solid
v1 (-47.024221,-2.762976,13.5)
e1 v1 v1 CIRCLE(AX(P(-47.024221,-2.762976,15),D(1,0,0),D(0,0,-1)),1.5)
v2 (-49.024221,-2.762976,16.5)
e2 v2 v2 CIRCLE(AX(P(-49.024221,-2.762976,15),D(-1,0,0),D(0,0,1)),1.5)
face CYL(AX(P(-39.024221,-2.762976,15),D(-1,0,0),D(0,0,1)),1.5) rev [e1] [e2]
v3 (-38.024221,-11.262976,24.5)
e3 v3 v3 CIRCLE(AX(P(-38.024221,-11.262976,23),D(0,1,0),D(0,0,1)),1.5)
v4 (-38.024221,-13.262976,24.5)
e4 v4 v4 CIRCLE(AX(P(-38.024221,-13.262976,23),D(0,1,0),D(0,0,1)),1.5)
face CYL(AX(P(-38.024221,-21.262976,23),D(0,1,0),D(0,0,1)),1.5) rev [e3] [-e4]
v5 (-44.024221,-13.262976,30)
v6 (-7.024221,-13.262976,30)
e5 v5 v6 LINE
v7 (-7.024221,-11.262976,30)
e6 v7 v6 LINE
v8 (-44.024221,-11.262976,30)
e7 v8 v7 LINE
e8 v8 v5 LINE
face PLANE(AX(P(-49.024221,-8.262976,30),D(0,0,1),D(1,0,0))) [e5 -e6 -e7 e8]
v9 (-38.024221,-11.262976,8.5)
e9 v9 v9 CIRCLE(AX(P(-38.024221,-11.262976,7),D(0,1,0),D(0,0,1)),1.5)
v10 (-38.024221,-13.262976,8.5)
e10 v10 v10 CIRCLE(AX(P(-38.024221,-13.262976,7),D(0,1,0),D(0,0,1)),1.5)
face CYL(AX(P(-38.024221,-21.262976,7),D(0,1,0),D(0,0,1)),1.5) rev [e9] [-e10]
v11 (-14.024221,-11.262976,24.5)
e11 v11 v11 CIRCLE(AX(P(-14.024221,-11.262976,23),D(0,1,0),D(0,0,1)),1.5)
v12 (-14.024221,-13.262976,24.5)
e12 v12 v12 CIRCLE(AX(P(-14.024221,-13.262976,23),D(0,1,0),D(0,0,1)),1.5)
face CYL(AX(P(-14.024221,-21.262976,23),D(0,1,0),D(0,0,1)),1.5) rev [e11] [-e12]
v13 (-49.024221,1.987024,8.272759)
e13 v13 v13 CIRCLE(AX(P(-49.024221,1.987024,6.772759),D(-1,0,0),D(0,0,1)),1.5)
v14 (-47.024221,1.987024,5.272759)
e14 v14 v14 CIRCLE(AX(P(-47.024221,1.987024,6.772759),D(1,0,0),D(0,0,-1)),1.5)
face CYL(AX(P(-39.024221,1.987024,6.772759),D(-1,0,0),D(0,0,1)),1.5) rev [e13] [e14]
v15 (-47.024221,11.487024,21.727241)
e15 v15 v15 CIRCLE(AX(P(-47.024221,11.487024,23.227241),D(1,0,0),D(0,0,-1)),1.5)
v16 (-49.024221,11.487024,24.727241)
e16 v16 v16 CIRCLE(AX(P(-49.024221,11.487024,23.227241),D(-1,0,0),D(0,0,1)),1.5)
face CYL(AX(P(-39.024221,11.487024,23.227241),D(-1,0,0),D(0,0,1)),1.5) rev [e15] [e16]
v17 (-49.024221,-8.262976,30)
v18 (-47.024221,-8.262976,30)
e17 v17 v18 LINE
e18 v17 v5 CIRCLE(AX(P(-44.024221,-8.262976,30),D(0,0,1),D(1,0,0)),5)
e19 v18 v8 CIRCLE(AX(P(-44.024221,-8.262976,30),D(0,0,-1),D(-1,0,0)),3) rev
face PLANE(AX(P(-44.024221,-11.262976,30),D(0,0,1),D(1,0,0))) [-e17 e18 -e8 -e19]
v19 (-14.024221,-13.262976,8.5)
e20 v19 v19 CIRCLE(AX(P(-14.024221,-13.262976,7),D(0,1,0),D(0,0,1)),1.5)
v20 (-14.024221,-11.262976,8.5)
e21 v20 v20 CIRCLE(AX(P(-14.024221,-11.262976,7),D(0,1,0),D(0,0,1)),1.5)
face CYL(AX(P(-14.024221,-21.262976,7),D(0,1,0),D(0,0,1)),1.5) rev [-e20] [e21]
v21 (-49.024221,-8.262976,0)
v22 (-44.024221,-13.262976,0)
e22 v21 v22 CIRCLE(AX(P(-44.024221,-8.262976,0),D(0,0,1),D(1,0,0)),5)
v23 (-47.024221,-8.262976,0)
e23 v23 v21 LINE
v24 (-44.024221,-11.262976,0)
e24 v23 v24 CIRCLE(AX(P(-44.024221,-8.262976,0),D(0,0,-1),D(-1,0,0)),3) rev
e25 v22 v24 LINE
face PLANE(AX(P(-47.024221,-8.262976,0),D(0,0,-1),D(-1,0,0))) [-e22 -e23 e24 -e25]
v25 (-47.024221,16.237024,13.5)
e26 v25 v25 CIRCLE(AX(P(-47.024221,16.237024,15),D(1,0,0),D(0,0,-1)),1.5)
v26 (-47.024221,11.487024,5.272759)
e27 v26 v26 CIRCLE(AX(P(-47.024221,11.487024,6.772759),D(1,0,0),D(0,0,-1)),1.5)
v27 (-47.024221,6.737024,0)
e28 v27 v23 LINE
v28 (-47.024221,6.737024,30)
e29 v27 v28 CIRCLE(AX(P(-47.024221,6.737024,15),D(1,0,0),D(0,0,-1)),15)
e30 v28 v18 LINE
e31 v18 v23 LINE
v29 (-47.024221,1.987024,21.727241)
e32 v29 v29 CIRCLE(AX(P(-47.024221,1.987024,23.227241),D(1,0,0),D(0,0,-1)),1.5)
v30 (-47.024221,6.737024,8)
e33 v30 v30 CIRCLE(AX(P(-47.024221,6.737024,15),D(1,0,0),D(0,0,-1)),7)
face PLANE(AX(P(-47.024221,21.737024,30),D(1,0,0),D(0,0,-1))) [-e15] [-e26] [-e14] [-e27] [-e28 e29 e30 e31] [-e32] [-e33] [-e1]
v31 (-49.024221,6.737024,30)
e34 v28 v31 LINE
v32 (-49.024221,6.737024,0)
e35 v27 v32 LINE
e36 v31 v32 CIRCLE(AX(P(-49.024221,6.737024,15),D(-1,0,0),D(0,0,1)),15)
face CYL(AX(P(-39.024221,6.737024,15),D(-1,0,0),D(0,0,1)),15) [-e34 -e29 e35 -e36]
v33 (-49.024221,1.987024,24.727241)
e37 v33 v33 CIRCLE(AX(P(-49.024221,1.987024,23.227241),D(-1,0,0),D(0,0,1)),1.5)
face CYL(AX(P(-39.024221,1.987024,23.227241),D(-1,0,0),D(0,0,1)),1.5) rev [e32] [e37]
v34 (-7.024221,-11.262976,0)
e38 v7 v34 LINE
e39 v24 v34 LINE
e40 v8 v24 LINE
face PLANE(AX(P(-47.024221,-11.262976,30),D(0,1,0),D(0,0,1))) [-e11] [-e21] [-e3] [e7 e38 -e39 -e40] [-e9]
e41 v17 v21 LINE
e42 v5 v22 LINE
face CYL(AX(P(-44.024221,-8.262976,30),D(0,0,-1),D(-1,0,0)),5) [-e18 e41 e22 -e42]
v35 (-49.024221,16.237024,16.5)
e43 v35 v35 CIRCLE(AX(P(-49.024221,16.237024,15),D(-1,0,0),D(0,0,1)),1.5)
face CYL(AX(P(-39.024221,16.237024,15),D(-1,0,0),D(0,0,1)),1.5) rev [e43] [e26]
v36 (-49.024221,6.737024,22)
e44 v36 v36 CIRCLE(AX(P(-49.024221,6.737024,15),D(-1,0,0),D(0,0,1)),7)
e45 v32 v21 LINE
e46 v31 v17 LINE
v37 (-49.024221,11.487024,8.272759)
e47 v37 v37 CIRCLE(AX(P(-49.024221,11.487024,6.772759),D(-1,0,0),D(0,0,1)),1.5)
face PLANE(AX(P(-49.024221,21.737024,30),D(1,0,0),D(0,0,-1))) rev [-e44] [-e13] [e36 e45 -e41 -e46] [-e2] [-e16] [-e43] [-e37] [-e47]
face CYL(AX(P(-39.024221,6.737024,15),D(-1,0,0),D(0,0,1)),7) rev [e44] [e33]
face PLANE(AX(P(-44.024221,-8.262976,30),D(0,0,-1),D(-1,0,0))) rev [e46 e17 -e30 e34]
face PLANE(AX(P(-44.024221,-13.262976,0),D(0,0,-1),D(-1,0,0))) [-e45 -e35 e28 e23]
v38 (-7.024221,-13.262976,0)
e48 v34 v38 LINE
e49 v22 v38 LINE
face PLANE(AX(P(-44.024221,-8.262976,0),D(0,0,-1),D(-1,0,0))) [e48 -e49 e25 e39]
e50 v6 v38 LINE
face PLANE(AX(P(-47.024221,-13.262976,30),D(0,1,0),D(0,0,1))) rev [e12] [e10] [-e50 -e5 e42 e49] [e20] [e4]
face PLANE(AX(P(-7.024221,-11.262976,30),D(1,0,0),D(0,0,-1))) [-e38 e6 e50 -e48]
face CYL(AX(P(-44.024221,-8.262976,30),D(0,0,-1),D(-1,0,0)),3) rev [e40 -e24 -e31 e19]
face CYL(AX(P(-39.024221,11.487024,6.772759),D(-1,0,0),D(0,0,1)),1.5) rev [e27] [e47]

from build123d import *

# Parameters (mm, degrees)
SM_BASE_FLANGE_1_DEPTH = 30
SKETCH_4_R             = 7
SKETCH_4_R_2           = 1.5
CUT_EXTRUDE_1_DEPTH    = 10
SKETCH_5_R             = 1.5
CUT_EXTRUDE_2_DEPTH    = 10


# Sheet-metal steps are written as plain solids
with BuildPart() as part:
    # Sketch 1 → 基体-法兰1 (new body)
    with BuildSketch(Plane.XY):
        with BuildLine():
            Line((-47.024221453, 21.737024221), (-47.024221453, -8.262975779))
            ThreePointArc((-47.024221453, -8.262975779), (-46.145541797, -10.384296122), (-44.024221453, -11.262975779))
            Line((-44.024221453, -11.262975779), (-7.024221453, -11.262975779))
            Line((-7.024221453, -11.262975779), (-7.024221453, -13.262975779))
            Line((-7.024221453, -13.262975779), (-44.024221453, -13.262975779))
            ThreePointArc((-44.024221453, -13.262975779), (-47.559755359, -11.798509684), (-49.024221453, -8.262975779))
            Line((-49.024221453, -8.262975779), (-49.024221453, 21.737024221))
            Line((-49.024221453, 21.737024221), (-47.024221453, 21.737024221))
        make_face()
    extrude(amount=SM_BASE_FLANGE_1_DEPTH)

    # 草图4 → 切除-拉伸1 (cut)
    with BuildSketch(Plane.ZY.offset(49.024221453)):
        with Locations((15, 6.737024221)):
            Circle(SKETCH_4_R)
        with Locations((6.772758664, 11.487024221)):
            Circle(SKETCH_4_R_2)
        with Locations((6.772758664, 1.987024221)):
            Circle(SKETCH_4_R_2)
        with Locations((15, -2.762975779)):
            Circle(SKETCH_4_R_2)
        with Locations((23.227241336, 1.987024221)):
            Circle(SKETCH_4_R_2)
        with Locations((23.227241336, 11.487024221)):
            Circle(SKETCH_4_R_2)
        with Locations((15, 16.237024221)):
            Circle(SKETCH_4_R_2)
        with BuildLine():
            Line((30, 21.737024221), (15, 21.737024221))
            ThreePointArc((15, 21.737024221), (25.606601718, 17.343625939), (30, 6.737024221))
            Line((30, 6.737024221), (30, 21.737024221))
        make_face()
        with BuildLine():
            Line((0, 21.737024221), (0, 6.737024221))
            ThreePointArc((0, 6.737024221), (4.393398282, 17.343625939), (15, 21.737024221))
            Line((15, 21.737024221), (0, 21.737024221))
        make_face()
    extrude(amount=-CUT_EXTRUDE_1_DEPTH, mode=Mode.SUBTRACT)

    # 草图5 → 切除-拉伸2 (cut)
    with BuildSketch(Plane(origin=(0, -11.262975779, 0), x_dir=(1, 0, 0), z_dir=(0, 1, 0))):
        with Locations(Location((-38.024221453, -23, 0), (0, 0, 270))):
            Circle(SKETCH_5_R)
        with Locations(Location((-38.024221453, -7, 0), (0, 0, 270))):
            Circle(SKETCH_5_R)
        with Locations(Location((-14.024221453, -23, 0), (0, 0, 270))):
            Circle(SKETCH_5_R)
        with Locations(Location((-14.024221453, -7, 0), (0, 0, 270))):
            Circle(SKETCH_5_R)
    extrude(amount=-CUT_EXTRUDE_2_DEPTH, mode=Mode.SUBTRACT)


solid = part.part
